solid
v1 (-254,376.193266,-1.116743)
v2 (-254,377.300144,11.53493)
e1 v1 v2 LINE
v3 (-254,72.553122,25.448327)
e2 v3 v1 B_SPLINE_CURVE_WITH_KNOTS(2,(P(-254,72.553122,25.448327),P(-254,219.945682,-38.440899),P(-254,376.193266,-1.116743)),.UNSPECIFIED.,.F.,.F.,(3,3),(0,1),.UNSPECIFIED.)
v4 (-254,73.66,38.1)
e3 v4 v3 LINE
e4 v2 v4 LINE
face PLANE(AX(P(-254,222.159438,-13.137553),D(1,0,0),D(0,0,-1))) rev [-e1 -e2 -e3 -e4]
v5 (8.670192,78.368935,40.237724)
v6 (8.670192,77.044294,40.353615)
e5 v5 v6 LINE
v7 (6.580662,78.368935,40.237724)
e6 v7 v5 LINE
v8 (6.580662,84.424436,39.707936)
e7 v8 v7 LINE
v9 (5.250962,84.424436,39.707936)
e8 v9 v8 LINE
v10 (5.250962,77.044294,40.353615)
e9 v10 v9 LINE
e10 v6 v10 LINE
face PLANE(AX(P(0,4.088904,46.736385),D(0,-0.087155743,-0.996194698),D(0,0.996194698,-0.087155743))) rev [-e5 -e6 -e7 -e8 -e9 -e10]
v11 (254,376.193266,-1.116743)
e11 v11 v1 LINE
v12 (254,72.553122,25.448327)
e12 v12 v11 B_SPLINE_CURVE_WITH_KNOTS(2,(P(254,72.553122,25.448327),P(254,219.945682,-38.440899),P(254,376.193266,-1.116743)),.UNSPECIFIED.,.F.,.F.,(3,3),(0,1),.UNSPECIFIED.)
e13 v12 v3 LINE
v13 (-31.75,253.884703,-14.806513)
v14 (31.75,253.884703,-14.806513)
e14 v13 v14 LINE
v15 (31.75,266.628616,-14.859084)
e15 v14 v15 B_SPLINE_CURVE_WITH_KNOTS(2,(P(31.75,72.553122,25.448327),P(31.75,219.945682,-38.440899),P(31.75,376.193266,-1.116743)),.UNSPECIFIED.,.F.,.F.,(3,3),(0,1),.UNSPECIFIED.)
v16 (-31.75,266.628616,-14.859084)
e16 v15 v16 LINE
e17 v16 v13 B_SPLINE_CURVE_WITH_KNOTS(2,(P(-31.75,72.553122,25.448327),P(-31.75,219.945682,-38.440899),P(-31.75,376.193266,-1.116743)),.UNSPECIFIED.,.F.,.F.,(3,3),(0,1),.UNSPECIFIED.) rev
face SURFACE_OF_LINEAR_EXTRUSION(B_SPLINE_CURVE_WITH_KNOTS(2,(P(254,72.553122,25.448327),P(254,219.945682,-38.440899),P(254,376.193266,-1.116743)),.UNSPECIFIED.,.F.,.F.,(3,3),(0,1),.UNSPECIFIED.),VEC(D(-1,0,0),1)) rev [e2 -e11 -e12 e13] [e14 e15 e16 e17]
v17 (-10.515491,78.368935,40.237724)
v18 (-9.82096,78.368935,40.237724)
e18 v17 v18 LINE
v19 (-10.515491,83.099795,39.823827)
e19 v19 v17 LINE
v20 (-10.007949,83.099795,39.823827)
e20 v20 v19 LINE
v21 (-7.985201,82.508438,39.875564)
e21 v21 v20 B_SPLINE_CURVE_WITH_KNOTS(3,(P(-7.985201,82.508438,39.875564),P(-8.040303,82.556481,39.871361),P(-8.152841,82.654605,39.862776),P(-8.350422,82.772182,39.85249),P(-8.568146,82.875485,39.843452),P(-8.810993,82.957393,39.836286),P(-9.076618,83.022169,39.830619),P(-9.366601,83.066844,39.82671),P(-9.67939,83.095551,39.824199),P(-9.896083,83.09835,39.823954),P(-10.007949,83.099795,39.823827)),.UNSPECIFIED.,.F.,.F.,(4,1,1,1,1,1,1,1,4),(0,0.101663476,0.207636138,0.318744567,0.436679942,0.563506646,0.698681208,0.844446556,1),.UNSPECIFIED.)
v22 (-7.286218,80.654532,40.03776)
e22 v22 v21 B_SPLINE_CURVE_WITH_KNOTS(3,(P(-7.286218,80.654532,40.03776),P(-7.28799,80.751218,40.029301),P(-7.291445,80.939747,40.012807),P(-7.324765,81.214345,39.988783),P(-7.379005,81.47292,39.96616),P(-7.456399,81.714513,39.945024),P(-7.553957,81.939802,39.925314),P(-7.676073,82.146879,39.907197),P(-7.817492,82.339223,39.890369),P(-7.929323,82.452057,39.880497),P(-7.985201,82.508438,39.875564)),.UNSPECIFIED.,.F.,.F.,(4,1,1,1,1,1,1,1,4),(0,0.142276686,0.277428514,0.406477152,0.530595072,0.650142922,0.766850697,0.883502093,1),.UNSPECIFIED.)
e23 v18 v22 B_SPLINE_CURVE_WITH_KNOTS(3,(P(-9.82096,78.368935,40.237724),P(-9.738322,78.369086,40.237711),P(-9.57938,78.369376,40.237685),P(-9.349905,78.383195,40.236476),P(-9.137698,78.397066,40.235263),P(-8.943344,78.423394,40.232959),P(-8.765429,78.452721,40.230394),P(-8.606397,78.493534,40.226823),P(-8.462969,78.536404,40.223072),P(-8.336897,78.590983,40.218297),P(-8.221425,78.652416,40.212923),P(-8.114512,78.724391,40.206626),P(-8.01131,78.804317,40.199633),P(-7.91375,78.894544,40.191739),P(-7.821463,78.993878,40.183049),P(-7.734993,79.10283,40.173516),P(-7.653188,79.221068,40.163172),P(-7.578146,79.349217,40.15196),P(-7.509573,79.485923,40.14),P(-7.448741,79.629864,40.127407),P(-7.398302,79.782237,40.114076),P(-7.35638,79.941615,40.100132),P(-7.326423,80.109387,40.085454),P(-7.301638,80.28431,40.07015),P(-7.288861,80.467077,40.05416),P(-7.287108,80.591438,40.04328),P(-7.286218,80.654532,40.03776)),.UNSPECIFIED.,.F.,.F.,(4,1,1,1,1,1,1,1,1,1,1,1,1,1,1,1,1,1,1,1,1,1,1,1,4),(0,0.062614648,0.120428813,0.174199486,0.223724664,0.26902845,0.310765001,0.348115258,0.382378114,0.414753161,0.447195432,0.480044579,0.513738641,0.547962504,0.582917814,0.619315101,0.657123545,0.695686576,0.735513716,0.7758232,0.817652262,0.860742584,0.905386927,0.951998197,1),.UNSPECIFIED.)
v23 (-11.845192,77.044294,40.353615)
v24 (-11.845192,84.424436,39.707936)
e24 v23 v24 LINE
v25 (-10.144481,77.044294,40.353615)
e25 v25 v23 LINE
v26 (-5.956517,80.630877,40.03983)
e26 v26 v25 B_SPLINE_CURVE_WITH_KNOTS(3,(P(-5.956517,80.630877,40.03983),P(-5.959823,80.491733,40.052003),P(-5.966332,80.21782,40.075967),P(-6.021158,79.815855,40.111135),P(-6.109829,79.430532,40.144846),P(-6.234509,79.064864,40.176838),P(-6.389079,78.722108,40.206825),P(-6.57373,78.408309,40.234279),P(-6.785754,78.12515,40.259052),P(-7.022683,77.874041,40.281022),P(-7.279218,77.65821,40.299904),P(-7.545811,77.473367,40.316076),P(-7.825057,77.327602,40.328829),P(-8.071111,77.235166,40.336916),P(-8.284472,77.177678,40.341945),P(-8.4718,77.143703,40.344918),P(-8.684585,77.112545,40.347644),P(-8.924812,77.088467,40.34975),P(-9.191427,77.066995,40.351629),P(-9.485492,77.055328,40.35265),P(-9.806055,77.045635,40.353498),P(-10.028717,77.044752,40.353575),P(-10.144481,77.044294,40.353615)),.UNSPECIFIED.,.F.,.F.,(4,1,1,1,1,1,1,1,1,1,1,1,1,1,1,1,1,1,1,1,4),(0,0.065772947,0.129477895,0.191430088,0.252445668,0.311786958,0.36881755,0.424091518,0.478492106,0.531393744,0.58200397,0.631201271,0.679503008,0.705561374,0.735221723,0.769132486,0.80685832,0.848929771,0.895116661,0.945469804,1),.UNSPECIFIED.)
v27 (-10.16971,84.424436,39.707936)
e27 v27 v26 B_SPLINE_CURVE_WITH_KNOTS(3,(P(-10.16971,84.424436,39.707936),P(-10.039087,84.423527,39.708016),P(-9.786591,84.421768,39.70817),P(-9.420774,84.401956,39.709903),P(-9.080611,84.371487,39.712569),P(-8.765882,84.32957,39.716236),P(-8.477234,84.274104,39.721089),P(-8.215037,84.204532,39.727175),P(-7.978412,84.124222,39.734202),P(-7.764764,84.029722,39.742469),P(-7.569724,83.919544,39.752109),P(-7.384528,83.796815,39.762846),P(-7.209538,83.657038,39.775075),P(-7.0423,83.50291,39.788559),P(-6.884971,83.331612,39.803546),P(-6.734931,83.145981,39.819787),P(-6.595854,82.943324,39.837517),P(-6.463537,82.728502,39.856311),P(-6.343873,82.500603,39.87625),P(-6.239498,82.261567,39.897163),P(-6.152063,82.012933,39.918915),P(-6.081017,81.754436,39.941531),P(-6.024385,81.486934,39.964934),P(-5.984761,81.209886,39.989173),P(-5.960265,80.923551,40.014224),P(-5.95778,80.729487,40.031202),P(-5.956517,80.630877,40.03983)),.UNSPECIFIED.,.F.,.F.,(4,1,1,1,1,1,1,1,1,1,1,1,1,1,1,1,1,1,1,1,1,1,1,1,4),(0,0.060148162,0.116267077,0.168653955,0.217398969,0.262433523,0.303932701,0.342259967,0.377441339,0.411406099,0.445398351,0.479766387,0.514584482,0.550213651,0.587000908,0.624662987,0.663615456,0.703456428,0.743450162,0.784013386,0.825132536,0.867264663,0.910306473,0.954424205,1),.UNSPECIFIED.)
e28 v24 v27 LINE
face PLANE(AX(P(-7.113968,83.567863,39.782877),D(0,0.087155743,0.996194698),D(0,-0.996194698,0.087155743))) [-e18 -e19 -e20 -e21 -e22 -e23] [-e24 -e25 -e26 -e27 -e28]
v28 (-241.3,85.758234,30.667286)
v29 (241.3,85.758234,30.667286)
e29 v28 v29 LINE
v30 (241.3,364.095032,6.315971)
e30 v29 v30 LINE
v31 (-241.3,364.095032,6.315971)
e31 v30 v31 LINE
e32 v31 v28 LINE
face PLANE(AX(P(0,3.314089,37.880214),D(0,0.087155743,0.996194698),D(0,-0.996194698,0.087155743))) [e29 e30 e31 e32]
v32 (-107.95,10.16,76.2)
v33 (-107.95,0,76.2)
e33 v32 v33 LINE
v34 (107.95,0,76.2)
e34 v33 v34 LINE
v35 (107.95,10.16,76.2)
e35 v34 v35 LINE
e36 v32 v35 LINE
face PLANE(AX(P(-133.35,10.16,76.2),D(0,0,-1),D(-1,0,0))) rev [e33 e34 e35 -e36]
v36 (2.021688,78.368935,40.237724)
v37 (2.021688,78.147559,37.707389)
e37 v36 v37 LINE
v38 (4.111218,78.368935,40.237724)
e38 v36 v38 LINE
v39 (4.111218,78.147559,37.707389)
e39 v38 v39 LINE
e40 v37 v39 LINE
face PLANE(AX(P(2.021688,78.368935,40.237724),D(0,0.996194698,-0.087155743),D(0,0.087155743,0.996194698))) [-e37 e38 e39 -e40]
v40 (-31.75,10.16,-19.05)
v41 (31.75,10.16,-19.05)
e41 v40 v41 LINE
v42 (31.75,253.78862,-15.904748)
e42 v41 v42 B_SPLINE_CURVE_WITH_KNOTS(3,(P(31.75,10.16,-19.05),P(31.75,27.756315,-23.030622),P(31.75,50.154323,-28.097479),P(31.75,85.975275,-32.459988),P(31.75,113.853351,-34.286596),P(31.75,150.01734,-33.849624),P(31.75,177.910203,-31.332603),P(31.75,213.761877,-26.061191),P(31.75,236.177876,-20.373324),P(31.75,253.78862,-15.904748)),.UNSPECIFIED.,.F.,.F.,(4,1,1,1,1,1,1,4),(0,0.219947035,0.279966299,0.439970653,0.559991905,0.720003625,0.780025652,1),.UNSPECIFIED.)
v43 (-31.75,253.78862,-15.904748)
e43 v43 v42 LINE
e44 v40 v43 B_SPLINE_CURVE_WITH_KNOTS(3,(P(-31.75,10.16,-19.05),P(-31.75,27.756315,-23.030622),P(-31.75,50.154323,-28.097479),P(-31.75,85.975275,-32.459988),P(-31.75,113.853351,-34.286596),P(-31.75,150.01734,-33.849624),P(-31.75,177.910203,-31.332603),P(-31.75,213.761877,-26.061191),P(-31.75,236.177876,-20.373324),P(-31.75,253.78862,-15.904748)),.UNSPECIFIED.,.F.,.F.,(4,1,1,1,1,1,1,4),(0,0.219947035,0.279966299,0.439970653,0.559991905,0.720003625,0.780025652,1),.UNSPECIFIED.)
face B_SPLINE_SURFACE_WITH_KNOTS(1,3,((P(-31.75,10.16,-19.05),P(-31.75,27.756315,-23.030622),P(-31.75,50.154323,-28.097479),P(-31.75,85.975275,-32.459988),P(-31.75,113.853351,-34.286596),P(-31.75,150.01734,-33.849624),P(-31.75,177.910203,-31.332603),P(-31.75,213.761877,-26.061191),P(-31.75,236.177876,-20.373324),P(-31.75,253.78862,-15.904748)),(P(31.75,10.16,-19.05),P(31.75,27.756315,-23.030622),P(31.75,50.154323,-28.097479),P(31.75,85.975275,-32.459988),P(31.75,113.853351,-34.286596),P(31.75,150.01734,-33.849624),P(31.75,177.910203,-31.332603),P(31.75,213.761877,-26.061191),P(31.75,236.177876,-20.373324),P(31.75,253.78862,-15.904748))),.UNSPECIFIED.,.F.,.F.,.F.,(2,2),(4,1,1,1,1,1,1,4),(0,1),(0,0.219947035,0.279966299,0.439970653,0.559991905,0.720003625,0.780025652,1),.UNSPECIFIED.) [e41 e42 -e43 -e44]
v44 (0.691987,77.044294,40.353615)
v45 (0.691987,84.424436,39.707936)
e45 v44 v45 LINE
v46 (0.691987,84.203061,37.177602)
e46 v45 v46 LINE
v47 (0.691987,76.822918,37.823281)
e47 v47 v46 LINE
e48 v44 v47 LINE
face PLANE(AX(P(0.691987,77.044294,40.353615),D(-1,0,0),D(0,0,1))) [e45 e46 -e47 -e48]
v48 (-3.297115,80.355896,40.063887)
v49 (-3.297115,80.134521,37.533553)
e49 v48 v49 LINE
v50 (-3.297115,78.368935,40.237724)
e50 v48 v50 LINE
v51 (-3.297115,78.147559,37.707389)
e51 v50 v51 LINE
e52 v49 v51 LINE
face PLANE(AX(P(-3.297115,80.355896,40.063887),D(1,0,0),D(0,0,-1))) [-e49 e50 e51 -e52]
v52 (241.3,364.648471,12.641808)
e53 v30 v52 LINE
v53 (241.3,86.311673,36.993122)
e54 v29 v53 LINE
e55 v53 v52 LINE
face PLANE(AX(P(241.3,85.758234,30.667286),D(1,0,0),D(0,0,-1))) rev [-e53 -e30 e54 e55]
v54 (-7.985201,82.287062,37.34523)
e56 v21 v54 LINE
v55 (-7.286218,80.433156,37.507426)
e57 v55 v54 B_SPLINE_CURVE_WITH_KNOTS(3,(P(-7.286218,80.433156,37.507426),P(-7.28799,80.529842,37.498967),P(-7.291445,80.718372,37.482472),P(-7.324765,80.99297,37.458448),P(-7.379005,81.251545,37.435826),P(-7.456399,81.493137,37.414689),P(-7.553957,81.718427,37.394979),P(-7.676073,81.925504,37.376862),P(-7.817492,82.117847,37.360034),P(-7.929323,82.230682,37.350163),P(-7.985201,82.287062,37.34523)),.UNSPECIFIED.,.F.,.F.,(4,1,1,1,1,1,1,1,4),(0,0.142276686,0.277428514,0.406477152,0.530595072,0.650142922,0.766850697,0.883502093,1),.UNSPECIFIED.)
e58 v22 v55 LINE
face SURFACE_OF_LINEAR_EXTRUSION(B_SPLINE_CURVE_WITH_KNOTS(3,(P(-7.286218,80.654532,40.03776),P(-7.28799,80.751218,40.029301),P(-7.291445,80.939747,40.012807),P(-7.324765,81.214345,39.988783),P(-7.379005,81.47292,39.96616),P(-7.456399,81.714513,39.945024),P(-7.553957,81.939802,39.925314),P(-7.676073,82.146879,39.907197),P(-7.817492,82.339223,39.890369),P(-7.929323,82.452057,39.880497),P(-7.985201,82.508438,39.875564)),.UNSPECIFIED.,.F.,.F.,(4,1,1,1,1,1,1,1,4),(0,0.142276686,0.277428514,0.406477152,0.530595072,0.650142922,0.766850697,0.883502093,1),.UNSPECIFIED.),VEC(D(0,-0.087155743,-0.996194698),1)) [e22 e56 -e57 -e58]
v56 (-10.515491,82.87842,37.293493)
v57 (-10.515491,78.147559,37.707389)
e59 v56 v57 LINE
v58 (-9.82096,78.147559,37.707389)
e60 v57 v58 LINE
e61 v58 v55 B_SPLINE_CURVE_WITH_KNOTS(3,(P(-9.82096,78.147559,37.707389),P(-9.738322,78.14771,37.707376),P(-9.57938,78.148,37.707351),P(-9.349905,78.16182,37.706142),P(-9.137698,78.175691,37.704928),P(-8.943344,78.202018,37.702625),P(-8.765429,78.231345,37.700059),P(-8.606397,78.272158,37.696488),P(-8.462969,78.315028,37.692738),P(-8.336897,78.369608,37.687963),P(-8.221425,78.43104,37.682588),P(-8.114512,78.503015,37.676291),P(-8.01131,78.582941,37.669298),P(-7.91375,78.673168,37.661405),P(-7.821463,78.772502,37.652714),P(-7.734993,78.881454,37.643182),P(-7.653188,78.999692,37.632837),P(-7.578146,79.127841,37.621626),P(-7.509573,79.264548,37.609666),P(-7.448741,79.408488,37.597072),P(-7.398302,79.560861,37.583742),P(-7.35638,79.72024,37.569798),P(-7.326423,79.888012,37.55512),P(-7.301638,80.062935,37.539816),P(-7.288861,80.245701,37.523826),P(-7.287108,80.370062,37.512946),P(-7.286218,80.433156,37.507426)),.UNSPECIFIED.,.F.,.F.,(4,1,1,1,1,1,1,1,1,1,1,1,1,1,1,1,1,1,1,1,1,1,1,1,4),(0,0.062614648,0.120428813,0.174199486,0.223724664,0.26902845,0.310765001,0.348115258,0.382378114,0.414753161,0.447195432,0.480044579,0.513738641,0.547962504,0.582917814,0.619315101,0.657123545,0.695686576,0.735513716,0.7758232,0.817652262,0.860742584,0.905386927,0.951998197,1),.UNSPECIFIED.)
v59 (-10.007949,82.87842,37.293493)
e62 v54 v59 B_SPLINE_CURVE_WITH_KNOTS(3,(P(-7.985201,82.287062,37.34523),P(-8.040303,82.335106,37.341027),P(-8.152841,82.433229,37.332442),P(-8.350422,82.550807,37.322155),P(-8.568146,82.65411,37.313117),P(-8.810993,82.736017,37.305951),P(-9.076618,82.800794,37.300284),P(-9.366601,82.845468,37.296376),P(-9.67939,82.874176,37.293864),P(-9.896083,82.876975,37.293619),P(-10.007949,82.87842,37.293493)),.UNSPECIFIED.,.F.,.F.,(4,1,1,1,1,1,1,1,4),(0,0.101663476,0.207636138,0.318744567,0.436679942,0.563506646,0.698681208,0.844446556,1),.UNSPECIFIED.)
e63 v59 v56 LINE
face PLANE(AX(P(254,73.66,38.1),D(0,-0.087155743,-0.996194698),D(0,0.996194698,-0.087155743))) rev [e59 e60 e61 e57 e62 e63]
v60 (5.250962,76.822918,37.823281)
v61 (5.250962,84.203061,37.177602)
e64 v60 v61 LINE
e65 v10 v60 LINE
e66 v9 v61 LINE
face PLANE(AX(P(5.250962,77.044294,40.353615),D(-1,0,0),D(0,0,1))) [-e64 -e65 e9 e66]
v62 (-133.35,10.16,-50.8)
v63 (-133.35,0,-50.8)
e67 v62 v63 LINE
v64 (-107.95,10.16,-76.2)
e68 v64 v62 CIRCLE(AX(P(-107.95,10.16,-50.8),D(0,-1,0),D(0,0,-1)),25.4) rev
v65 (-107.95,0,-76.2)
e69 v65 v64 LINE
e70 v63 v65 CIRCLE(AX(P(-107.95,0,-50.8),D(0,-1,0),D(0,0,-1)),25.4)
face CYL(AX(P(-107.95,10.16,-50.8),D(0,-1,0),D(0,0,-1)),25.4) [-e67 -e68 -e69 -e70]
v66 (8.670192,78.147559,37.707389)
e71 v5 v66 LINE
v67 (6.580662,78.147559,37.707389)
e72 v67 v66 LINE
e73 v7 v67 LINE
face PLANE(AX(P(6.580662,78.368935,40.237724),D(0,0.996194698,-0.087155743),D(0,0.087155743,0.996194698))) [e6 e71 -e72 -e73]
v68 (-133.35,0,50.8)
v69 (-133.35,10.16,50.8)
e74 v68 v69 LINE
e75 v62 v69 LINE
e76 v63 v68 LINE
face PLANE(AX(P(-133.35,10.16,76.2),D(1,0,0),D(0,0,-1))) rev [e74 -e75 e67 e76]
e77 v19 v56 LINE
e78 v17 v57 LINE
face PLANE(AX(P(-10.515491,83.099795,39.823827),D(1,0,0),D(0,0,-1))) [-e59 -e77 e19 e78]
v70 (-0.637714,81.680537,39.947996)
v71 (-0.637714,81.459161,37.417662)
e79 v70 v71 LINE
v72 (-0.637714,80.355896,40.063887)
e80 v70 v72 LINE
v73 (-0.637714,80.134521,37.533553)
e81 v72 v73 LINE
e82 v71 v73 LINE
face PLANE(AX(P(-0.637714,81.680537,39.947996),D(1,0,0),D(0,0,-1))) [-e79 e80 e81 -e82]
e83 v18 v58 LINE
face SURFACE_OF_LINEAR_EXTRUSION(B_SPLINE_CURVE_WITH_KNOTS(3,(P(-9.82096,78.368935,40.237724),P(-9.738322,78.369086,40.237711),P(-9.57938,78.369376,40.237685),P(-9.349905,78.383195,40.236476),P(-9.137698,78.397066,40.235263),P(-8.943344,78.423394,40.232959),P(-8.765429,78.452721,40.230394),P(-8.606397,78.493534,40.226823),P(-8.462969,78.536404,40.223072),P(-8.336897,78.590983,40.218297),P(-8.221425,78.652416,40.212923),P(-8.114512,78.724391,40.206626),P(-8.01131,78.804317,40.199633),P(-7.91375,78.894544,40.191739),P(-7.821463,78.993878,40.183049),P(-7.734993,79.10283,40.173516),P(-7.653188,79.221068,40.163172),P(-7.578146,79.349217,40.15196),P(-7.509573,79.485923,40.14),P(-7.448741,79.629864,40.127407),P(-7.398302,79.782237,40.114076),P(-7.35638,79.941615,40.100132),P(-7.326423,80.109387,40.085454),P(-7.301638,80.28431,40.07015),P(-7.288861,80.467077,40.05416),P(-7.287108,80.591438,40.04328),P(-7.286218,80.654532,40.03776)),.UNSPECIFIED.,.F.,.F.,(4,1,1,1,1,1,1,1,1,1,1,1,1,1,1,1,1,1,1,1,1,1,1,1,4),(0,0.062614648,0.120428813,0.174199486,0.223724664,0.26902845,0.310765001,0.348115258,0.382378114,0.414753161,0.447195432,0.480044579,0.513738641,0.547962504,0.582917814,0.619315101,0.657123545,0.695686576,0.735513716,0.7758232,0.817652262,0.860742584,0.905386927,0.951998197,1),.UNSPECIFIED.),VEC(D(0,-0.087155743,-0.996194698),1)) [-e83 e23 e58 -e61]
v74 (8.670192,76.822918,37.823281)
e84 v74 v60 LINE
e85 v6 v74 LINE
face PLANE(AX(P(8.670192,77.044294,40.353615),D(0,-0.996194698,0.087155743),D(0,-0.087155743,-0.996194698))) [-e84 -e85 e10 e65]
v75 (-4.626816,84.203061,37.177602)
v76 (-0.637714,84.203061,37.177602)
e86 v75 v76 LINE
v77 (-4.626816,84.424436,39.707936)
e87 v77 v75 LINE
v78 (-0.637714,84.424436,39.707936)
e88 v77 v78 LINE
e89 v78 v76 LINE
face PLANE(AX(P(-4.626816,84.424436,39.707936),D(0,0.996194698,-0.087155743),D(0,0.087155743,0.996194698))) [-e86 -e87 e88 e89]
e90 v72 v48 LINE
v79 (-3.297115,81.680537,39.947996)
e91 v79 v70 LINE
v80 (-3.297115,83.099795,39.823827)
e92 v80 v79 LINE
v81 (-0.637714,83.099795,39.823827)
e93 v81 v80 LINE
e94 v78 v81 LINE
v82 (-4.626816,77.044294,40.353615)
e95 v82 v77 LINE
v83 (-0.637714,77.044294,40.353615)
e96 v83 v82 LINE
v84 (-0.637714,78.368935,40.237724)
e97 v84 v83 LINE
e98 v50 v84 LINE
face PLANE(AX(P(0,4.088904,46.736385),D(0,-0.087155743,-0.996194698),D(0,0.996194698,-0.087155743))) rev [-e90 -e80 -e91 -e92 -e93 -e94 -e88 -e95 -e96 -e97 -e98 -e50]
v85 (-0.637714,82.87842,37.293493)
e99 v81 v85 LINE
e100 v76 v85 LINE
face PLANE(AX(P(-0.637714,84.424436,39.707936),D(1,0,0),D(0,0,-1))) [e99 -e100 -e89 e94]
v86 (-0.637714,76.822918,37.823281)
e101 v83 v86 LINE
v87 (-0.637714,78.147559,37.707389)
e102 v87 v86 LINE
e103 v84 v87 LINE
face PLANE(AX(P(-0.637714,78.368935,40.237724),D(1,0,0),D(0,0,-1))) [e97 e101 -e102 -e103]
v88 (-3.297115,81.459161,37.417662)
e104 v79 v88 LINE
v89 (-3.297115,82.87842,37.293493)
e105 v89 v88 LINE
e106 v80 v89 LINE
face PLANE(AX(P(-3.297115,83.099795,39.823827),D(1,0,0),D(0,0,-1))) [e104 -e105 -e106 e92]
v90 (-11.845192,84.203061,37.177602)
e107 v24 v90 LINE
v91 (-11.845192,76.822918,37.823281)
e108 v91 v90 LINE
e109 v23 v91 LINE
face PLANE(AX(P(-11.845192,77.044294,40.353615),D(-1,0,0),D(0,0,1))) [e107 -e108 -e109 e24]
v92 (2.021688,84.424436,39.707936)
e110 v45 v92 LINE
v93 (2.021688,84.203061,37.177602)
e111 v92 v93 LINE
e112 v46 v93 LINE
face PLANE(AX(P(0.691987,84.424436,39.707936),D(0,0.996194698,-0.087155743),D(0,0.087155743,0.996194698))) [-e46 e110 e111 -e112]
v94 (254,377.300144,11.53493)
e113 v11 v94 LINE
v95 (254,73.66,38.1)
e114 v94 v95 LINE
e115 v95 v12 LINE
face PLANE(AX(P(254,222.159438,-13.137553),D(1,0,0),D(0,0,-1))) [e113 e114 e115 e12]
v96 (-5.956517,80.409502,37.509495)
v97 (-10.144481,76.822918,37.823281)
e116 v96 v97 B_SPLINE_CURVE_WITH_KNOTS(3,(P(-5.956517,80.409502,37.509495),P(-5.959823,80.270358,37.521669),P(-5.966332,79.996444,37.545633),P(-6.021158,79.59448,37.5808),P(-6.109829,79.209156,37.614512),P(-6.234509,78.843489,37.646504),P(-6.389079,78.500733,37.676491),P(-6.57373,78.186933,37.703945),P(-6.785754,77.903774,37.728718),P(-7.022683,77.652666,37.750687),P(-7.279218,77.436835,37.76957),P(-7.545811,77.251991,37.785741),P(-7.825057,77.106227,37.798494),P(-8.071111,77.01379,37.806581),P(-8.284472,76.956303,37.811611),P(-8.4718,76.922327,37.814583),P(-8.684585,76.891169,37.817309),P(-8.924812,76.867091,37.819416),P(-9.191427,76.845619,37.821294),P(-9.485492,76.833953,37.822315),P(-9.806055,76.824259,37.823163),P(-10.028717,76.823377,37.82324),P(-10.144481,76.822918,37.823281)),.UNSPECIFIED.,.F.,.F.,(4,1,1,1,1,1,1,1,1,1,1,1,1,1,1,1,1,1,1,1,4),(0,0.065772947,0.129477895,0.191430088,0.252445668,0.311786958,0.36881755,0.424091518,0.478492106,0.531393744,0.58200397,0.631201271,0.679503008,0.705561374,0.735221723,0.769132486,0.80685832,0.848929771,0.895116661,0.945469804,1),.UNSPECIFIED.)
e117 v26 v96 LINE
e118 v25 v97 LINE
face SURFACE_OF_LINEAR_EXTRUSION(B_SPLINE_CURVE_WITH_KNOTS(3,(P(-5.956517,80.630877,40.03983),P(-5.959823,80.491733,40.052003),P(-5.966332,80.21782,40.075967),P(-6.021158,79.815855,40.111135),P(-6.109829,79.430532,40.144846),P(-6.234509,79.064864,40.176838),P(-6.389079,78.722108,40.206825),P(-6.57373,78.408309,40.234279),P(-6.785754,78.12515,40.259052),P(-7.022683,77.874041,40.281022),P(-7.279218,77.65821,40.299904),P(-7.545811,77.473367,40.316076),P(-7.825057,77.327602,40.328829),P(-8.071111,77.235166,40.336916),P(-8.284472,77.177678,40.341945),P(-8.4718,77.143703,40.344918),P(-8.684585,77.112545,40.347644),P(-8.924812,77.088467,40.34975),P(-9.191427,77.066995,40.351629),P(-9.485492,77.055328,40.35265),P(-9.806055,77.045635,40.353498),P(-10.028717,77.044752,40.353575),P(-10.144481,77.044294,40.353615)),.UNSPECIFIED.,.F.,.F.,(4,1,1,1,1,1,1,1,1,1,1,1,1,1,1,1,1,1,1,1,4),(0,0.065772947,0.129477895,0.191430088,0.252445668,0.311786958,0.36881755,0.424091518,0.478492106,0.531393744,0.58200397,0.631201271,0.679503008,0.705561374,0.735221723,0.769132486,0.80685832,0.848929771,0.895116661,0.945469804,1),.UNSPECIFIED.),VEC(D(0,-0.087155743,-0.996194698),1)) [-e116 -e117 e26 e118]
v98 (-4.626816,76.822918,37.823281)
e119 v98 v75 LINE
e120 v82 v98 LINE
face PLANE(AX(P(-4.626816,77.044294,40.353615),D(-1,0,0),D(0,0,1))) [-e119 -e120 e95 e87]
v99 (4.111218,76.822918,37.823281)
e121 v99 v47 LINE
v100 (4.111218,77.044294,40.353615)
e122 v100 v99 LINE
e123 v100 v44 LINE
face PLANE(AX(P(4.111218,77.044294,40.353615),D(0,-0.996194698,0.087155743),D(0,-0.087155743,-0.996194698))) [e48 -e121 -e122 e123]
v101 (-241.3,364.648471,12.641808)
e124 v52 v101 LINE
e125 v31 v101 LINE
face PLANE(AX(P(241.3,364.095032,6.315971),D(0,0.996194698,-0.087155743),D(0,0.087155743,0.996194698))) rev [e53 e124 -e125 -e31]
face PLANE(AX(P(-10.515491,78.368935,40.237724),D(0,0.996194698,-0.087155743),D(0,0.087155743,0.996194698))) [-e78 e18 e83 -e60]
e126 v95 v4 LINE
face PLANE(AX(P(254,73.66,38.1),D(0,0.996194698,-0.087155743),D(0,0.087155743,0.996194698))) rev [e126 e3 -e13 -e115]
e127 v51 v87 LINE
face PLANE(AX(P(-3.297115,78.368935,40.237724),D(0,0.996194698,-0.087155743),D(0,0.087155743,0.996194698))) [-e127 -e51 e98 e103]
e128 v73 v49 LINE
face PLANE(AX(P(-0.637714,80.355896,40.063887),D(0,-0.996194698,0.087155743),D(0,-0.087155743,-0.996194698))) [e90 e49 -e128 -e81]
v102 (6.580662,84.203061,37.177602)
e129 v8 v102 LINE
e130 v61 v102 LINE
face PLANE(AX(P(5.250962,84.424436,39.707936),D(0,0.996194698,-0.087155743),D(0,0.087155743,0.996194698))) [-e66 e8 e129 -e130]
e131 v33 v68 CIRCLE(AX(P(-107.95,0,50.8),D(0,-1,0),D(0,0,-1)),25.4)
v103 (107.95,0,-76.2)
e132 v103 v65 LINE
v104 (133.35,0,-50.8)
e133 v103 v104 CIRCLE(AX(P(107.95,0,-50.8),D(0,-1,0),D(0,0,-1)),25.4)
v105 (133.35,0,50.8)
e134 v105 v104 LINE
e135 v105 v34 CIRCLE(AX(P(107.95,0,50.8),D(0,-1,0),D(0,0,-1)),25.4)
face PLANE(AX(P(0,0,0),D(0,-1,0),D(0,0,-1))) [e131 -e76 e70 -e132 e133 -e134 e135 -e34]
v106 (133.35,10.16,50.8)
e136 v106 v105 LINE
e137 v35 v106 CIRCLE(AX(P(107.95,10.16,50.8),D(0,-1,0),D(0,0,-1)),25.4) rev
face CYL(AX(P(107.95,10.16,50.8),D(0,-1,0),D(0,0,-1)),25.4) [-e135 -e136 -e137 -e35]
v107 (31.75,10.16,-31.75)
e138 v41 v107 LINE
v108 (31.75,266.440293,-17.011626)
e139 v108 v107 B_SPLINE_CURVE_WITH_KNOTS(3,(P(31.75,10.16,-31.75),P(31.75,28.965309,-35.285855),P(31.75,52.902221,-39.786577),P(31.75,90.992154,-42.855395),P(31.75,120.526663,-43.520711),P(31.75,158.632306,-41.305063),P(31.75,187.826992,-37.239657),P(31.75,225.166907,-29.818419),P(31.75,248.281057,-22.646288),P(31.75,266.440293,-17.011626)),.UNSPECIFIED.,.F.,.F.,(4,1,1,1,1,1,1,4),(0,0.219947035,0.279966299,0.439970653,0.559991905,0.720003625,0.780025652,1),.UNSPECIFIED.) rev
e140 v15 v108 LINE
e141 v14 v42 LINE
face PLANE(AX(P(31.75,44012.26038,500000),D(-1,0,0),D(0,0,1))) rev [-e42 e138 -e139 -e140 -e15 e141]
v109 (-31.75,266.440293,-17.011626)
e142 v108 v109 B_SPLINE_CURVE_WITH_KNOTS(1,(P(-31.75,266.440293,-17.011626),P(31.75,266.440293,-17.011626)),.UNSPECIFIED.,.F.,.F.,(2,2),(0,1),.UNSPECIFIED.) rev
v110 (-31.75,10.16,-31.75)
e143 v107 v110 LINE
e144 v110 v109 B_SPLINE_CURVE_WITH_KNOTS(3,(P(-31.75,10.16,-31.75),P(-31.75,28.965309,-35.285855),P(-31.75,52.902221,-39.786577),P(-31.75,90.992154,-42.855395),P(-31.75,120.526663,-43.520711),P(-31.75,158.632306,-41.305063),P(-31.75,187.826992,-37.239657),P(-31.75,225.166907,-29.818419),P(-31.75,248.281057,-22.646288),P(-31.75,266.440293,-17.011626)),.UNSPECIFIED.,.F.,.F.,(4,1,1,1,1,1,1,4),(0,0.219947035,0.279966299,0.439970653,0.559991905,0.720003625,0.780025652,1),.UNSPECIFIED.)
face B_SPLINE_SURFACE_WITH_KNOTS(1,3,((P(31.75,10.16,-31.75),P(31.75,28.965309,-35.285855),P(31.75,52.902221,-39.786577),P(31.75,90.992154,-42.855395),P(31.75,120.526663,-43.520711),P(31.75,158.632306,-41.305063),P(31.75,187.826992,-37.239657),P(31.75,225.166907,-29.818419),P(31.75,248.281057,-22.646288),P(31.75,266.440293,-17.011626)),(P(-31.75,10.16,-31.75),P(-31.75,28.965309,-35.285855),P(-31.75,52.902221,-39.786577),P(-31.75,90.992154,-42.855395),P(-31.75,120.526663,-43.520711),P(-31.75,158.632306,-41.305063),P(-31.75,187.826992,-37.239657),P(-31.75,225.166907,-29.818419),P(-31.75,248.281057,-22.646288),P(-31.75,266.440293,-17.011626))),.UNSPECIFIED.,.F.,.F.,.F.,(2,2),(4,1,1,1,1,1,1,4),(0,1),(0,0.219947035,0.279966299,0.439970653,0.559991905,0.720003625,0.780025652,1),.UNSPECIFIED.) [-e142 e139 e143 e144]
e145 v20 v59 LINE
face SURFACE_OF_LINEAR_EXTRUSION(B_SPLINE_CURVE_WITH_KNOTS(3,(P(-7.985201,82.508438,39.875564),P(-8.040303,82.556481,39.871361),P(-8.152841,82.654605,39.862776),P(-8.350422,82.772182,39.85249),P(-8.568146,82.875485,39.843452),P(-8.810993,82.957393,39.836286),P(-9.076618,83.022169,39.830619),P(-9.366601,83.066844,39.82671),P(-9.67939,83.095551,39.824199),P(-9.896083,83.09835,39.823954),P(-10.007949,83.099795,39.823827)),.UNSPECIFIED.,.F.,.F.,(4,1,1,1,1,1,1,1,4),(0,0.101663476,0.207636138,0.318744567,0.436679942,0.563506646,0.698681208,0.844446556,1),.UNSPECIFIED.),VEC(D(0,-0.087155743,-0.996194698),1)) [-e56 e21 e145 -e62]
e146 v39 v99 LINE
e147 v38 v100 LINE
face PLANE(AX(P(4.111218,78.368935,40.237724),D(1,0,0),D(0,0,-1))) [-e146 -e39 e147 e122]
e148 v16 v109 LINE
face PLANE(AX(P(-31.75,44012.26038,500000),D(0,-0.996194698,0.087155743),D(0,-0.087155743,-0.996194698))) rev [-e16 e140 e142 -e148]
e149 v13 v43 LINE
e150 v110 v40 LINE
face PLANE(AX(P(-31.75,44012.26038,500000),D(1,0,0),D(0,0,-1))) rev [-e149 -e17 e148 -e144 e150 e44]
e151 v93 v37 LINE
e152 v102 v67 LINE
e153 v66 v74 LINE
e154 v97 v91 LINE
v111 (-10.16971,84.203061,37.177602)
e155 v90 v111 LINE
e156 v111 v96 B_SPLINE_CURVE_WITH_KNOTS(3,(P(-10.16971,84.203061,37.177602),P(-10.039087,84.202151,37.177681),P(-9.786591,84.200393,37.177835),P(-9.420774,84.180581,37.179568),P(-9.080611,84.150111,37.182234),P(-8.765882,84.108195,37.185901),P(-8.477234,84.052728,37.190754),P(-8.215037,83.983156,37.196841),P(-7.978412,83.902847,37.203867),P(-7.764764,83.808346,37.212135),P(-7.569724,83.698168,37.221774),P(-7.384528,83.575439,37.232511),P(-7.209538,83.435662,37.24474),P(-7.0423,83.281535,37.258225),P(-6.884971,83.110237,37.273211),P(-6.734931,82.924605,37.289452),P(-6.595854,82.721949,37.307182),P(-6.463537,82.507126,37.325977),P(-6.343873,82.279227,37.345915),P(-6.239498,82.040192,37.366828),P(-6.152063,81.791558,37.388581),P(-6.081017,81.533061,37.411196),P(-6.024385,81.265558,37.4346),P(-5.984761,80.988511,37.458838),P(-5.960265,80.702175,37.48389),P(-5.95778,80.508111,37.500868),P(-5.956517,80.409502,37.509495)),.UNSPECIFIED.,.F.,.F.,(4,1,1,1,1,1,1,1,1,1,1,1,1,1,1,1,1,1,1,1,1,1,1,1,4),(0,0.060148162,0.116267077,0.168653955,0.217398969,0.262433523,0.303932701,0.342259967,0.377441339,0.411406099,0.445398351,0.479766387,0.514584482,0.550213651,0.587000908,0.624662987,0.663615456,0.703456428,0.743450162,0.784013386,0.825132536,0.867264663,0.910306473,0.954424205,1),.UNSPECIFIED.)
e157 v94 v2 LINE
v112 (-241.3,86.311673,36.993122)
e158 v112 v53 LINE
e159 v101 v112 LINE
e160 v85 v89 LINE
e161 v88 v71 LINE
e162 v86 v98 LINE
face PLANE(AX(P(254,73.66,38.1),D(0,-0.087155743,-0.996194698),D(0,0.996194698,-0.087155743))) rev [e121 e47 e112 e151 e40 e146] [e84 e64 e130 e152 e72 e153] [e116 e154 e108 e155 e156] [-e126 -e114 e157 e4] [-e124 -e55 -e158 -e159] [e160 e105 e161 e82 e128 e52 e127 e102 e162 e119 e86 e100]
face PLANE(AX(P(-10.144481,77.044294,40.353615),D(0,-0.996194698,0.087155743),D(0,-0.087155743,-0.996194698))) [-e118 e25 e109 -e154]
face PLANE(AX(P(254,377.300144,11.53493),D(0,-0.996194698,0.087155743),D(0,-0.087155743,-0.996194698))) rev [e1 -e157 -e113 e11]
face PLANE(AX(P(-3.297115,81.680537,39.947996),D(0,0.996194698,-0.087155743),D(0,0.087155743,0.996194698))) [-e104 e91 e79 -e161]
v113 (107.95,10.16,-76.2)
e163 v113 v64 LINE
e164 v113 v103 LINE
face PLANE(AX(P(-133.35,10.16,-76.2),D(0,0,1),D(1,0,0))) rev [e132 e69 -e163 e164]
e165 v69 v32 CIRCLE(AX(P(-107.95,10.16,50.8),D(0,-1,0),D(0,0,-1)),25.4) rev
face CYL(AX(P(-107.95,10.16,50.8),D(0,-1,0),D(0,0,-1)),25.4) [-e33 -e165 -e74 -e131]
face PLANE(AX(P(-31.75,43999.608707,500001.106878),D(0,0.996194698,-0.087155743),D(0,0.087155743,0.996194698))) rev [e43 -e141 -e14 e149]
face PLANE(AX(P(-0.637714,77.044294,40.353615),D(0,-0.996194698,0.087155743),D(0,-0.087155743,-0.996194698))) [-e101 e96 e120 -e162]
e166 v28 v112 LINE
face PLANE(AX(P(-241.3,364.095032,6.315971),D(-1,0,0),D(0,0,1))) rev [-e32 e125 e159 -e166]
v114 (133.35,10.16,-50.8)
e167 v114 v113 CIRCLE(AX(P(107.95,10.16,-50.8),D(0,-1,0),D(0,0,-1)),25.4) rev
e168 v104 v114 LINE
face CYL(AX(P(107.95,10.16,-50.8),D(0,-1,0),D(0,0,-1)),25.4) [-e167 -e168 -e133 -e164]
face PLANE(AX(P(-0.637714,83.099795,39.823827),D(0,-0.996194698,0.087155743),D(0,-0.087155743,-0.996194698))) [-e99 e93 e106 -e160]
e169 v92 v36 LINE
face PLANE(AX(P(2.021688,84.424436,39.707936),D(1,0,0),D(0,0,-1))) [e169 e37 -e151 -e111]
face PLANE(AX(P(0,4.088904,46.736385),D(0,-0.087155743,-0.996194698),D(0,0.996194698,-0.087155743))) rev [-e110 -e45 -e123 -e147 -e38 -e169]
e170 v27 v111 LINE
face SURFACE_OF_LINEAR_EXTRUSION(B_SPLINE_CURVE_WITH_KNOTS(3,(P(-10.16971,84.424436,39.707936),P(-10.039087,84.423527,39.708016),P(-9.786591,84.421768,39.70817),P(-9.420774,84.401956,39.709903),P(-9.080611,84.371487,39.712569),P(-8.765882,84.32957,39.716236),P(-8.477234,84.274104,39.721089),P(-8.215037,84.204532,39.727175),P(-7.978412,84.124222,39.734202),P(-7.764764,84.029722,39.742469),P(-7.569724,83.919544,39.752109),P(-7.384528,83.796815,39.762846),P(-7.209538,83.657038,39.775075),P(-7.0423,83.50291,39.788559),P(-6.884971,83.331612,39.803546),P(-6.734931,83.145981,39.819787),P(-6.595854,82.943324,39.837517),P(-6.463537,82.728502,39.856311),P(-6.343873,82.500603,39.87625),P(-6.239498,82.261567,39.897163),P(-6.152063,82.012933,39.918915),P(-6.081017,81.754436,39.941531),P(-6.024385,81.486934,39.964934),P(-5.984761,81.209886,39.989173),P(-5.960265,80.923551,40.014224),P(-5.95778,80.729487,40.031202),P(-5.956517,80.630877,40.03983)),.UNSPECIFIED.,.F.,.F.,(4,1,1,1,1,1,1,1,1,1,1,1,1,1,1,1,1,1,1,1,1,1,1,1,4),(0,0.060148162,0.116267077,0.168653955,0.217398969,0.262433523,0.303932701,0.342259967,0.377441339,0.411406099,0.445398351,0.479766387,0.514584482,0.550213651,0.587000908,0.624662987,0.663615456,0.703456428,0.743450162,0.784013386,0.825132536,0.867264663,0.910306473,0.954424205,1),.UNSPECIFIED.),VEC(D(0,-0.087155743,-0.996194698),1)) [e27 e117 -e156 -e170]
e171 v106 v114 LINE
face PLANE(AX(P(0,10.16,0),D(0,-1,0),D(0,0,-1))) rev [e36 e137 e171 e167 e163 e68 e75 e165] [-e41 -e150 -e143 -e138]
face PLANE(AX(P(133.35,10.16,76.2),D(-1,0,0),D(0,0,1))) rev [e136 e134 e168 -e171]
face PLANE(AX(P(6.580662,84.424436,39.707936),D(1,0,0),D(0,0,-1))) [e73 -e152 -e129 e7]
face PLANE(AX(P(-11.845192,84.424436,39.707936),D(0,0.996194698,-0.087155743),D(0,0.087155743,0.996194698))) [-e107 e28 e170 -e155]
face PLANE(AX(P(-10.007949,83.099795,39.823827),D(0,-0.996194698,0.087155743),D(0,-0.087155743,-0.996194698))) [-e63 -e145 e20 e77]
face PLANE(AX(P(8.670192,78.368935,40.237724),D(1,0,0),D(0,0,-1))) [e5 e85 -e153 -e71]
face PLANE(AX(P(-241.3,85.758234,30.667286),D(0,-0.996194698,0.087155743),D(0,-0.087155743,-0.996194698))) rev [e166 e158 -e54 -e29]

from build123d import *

# Parameters (mm, degrees)
SKETCH1_W           = 266.7
SKETCH1_H           = 152.4
BOSS_EXTRUDE1_DEPTH = 10.16
BOSS_EXTRUDE3_DEPTH = 254
SKETCH6_W           = 482.6
SKETCH6_H           = 279.4
CUT_EXTRUDE1_DEPTH  = 6.35
LOFT1_START         = -31.75
LOFT1_DEPTH         = 63.5
BOSS_EXTRUDE4_REACH = 463.798
SKETCH7_2_W         = 63.5
SKETCH7_2_H         = 12.7
FILLET4_R           = 25.4
BOSS_EXTRUDE5_DEPTH = 2.54


# Read off the part's stored shape, not the designer's step: Loft1
with BuildPart() as part:
    # Sketch1 → Boss-Extrude1 (new body)
    with BuildSketch(Plane(origin=(0, 0, 0), x_dir=(1, 0, 0), z_dir=(0, 1, 0))):
        Rectangle(SKETCH1_W, SKETCH1_H)
    extrude(amount=BOSS_EXTRUDE1_DEPTH)

    # Loft1 outline → Loft1 (add)
    with BuildSketch(Plane.YZ.offset(LOFT1_START)):
        with BuildLine():
            Line((10.16, -19.05), (10.16, -31.75))
            add(Edge.make_bspline(
                [(10.16, -31.75), (28.965309161, -35.285855321), (52.902221104, -39.786576725), (90.992153833, -42.855395332), (120.526662629, -43.520710588), (158.632305833, -41.305063295), (187.826991891, -37.239656645), (225.166907406, -29.818418758), (248.281057243, -22.646287688), (266.440292521, -17.011625957)],
                knots=[0, 0, 0, 0, 0.219947035, 0.279966299, 0.439970653, 0.559991905, 0.720003625, 0.780025652, 1, 1, 1, 1], degree=3))
            Line((266.440292521, -17.011625957), (253.788619855, -15.904748024))
            add(Edge.make_bspline(
                [(10.16, -19.05), (27.75631541, -23.030622259), (50.154322743, -28.097478842), (85.975275474, -32.459987698), (113.853351235, -34.286596432), (150.017339583, -33.849624359), (177.910203308, -31.332603381), (213.761877453, -26.061191443), (236.17787553, -20.373323721), (253.788619855, -15.904748024)],
                knots=[0, 0, 0, 0, 0.219947035, 0.279966299, 0.439970653, 0.559991905, 0.720003625, 0.780025652, 1, 1, 1, 1], degree=3))
        make_face()
    extrude(amount=LOFT1_DEPTH)


with BuildPart() as body_2:
    # Sketch5 → Boss-Extrude3 (new, symmetric)
    with BuildSketch(Plane(origin=(0, 0, 0), x_dir=(0, 0, -1), z_dir=(1, 0, 0))):
        with BuildLine():
            Line((-38.1, 73.66), (-25.448327334, 72.553122067))
            add(Edge.make_bspline(
                [(1.116743055, 376.193266045), (38.440898524, 219.945682325), (-25.448327334, 72.553122067)],
                knots=[0, 0, 0, 1, 1, 1], degree=2))
            Line((1.116743055, 376.193266045), (-11.534929611, 377.300143978))
            Line((-11.534929611, 377.300143978), (-38.1, 73.66))
        make_face()
    extrude(amount=BOSS_EXTRUDE3_DEPTH, both=True)

    # Sketch6 → Cut-Extrude1 (cut)
    with BuildSketch(Plane(origin=(0, 3.867528241, 44.206050078), x_dir=(1, 0, 0), z_dir=(0, 0.08715574274765818, 0.9961946980917455))):
        with Locations((0, 222.459067663)):
            Rectangle(SKETCH6_W, SKETCH6_H)
    extrude(amount=-CUT_EXTRUDE1_DEPTH, mode=Mode.SUBTRACT)

    # Sketch7<2> → Boss-Extrude4 (add, up to next)
    with BuildSketch(Plane(origin=(0, 0.546894442, 6.251032081), x_dir=(1, 0, 0), z_dir=(0, 0.08715574274765883, 0.9961946980917455)), mode=Mode.PRIVATE) as boss_extrude4_sk1:
        with Locations((0, 260.559067663)):
            Rectangle(SKETCH7_2_W, SKETCH7_2_H)
    boss_extrude4_tool1 = extrude(boss_extrude4_sk1.sketch, amount=BOSS_EXTRUDE4_REACH, mode=Mode.PRIVATE) - body_2.part

    add(part.part)  # Boss-Extrude4 merges part
    add(boss_extrude4_tool1.solids().sort_by_distance((0, 260.114456, -16.458187))[0])

    # Fillet4
    fillet4_edges = [body_2.edges().sort_by_distance(p)[0] for p in [
        (133.35, 5.08, 76.2),
        (133.35, 5.08, -76.2),
        (-133.35, 5.08, -76.2),
        (-133.35, 5.08, 76.2),
    ]]
    fillet(fillet4_edges, radius=FILLET4_R)

    # Sketch9 → Boss-Extrude5 (add)
    # profile 1 of 4: a face of its own
    with BuildSketch(Plane(origin=(0, 3.867528241, 44.206050078), x_dir=(1, 0, 0), z_dir=(0, 0.08715574274765818, 0.9961946980917455))):
        with BuildLine():
            Line((-11.845192308, 80.642400996), (-10.169709869, 80.642400996))
            add(Edge.make_bspline(
                [(-10.169709869, 80.642400996), (-10.039086742, 80.641487896), (-9.786590759, 80.639722862), (-9.420774033, 80.619835181), (-9.080611029, 80.58924934), (-8.76588247, 80.547172972), (-8.477233602, 80.491494415), (-8.215036632, 80.421656578), (-7.978411563, 80.341040413), (-7.76476385, 80.246179137), (-7.569724038, 80.13558031), (-7.384527512, 80.012382096), (-7.2095379, 79.872071384), (-7.042299501, 79.717355048), (-6.884970561, 79.545402599), (-6.73493099, 79.359062194), (-6.595854438, 79.155631639), (-6.46353692, 78.939988558), (-6.343873333, 78.711219076), (-6.23949828, 78.47127043), (-6.152062666, 78.221686781), (-6.081016701, 77.962202136), (-6.024384868, 77.693677905), (-5.984760716, 77.415572233), (-5.96026467, 77.128142598), (-5.957779751, 76.933337422), (-5.956517094, 76.83435145)],
                knots=[0, 0, 0, 0, 1.44355588, 2.790409838, 4.047694926, 5.217575253, 6.298404546, 7.294384826, 8.214239204, 9.058592145, 9.873746385, 10.689560431, 11.514393297, 12.350027578, 13.205127629, 14.088021785, 14.991911688, 15.926770944, 16.882954281, 17.842803888, 18.816321264, 19.80318086, 20.814351908, 21.847355356, 22.906180909, 24, 24, 24, 24], degree=3))
            add(Edge.make_bspline(
                [(-5.956517094, 76.83435145), (-5.959823412, 76.694675801), (-5.966332092, 76.419716111), (-6.021157576, 76.016215932), (-6.109828948, 75.629420767), (-6.23450895, 75.262356277), (-6.389078777, 74.918291224), (-6.573729744, 74.603293052), (-6.785754438, 74.319052512), (-7.022682758, 74.066984889), (-7.279218425, 73.85032935), (-7.545810714, 73.664779736), (-7.825056719, 73.518458383), (-8.071111475, 73.425668764), (-8.284471646, 73.367961649), (-8.471799567, 73.333856188), (-8.684584973, 73.302579424), (-8.924811901, 73.278409413), (-9.191426528, 73.256855703), (-9.485491584, 73.245144256), (-9.80605497, 73.235413782), (-10.028716551, 73.234528126), (-10.14448117, 73.234067663)],
                knots=[0, 0, 0, 0, 1.315458931, 2.589557908, 3.828601765, 5.048913369, 6.235739168, 7.376350998, 8.481830359, 9.569842114, 10.627874879, 11.640079404, 12.624025415, 13.590060155, 14.111227486, 14.704434459, 15.382649715, 16.137166398, 16.978595427, 17.902333227, 18.909396075, 20, 20, 20, 20], degree=3))
            Line((-10.14448117, 73.234067663), (-11.845192308, 73.234067663))
            Line((-11.845192308, 73.234067663), (-11.845192308, 80.642400996))
        make_face()
        with BuildLine():
            Line((-10.515491453, 79.312700141), (-10.515491453, 74.563768517))
            Line((-10.515491453, 74.563768517), (-9.820960203, 74.563768517))
            add(Edge.make_bspline(
                [(-9.820960203, 74.563768517), (-9.738321651, 74.563919946), (-9.579380204, 74.564211192), (-9.349904733, 74.578083516), (-9.137698107, 74.592007503), (-8.943344483, 74.618435698), (-8.765429413, 74.647874846), (-8.606396987, 74.688843453), (-8.462968854, 74.731877503), (-8.336896961, 74.786665183), (-8.221425379, 74.848332363), (-8.114511884, 74.920582613), (-8.011310428, 75.000813792), (-7.913750445, 75.091385611), (-7.821462695, 75.19109873), (-7.734993209, 75.300466927), (-7.65318785, 75.419156515), (-7.578146405, 75.547795036), (-7.509573132, 75.685024038), (-7.448740954, 75.829514259), (-7.398302102, 75.982468991), (-7.356380416, 76.142456392), (-7.326422619, 76.310869336), (-7.301638255, 76.486460411), (-7.288861193, 76.669925294), (-7.287107621, 76.794760931), (-7.286217949, 76.858096108)],
                knots=[0, 0, 0, 0, 1.50275155, 2.890291501, 4.180787663, 5.369391935, 6.45668281, 7.458360028, 8.354766181, 9.177074746, 9.954075863, 10.732690366, 11.5210699, 12.329727389, 13.151100085, 13.990027547, 14.863562427, 15.770965086, 16.696477834, 17.652329173, 18.619756807, 19.62365428, 20.657822005, 21.729286259, 22.847956731, 24, 24, 24, 24], degree=3))
            add(Edge.make_bspline(
                [(-7.286217949, 76.858096108), (-7.287989874, 76.955151279), (-7.29144499, 77.144401343), (-7.324765386, 77.420048191), (-7.379004633, 77.679610993), (-7.456398814, 77.922126441), (-7.553956576, 78.14827613), (-7.676072858, 78.356144094), (-7.817492245, 78.549222228), (-7.929322837, 78.662488057), (-7.985201322, 78.719083688)],
                knots=[0, 0, 0, 0, 1.13821349, 2.219428113, 3.251817212, 4.244760574, 5.201143372, 6.134805572, 7.068016741, 8, 8, 8, 8], degree=3))
            add(Edge.make_bspline(
                [(-7.985201322, 78.719083688), (-8.0403028, 78.767310817), (-8.152841329, 78.865809267), (-8.350422003, 78.9838356), (-8.568145674, 79.087533301), (-8.810993205, 79.169754014), (-9.076617583, 79.234777659), (-9.366600873, 79.279622877), (-9.679390151, 79.308439938), (-9.896083274, 79.31124965), (-10.007949386, 79.312700141)],
                knots=[0, 0, 0, 0, 0.813307809, 1.661089106, 2.549956539, 3.493439533, 4.508053171, 5.589449661, 6.755572447, 8, 8, 8, 8], degree=3))
            Line((-10.007949386, 79.312700141), (-10.515491453, 79.312700141))
        make_face(mode=Mode.SUBTRACT)
    # profile 2 of 4: a face of its own
    with BuildSketch(Plane(origin=(0, 3.867528241, 44.206050078), x_dir=(1, 0, 0), z_dir=(0, 0.08715574274765818, 0.9961946980917455))):
        Polygon((-4.626816239, 80.642400996), (-0.637713675, 80.642400996), (-0.637713675, 79.312700141), (-3.297115385, 79.312700141), (-3.297115385, 77.888020654), (-0.637713675, 77.888020654), (-0.637713675, 76.5583198), (-3.297115385, 76.5583198), (-3.297115385, 74.563768517), (-0.637713675, 74.563768517), (-0.637713675, 73.234067663), (-4.626816239, 73.234067663), align=None)
    # profile 3 of 4: a face of its own
    with BuildSketch(Plane(origin=(0, 3.867528241, 44.206050078), x_dir=(1, 0, 0), z_dir=(0, 0.08715574274765818, 0.9961946980917455))):
        Polygon((0.691987179, 80.642400996), (2.021688034, 80.642400996), (2.021688034, 74.563768517), (4.111217949, 74.563768517), (4.111217949, 73.234067663), (0.691987179, 73.234067663), align=None)
    # profile 4 of 4: a face of its own
    with BuildSketch(Plane(origin=(0, 3.867528241, 44.206050078), x_dir=(1, 0, 0), z_dir=(0, 0.08715574274765818, 0.9961946980917455))):
        Polygon((5.250961538, 80.642400996), (6.580662393, 80.642400996), (6.580662393, 74.563768517), (8.670192308, 74.563768517), (8.670192308, 73.234067663), (5.250961538, 73.234067663), align=None)
    extrude(amount=BOSS_EXTRUDE5_DEPTH)


solid = body_2.part
